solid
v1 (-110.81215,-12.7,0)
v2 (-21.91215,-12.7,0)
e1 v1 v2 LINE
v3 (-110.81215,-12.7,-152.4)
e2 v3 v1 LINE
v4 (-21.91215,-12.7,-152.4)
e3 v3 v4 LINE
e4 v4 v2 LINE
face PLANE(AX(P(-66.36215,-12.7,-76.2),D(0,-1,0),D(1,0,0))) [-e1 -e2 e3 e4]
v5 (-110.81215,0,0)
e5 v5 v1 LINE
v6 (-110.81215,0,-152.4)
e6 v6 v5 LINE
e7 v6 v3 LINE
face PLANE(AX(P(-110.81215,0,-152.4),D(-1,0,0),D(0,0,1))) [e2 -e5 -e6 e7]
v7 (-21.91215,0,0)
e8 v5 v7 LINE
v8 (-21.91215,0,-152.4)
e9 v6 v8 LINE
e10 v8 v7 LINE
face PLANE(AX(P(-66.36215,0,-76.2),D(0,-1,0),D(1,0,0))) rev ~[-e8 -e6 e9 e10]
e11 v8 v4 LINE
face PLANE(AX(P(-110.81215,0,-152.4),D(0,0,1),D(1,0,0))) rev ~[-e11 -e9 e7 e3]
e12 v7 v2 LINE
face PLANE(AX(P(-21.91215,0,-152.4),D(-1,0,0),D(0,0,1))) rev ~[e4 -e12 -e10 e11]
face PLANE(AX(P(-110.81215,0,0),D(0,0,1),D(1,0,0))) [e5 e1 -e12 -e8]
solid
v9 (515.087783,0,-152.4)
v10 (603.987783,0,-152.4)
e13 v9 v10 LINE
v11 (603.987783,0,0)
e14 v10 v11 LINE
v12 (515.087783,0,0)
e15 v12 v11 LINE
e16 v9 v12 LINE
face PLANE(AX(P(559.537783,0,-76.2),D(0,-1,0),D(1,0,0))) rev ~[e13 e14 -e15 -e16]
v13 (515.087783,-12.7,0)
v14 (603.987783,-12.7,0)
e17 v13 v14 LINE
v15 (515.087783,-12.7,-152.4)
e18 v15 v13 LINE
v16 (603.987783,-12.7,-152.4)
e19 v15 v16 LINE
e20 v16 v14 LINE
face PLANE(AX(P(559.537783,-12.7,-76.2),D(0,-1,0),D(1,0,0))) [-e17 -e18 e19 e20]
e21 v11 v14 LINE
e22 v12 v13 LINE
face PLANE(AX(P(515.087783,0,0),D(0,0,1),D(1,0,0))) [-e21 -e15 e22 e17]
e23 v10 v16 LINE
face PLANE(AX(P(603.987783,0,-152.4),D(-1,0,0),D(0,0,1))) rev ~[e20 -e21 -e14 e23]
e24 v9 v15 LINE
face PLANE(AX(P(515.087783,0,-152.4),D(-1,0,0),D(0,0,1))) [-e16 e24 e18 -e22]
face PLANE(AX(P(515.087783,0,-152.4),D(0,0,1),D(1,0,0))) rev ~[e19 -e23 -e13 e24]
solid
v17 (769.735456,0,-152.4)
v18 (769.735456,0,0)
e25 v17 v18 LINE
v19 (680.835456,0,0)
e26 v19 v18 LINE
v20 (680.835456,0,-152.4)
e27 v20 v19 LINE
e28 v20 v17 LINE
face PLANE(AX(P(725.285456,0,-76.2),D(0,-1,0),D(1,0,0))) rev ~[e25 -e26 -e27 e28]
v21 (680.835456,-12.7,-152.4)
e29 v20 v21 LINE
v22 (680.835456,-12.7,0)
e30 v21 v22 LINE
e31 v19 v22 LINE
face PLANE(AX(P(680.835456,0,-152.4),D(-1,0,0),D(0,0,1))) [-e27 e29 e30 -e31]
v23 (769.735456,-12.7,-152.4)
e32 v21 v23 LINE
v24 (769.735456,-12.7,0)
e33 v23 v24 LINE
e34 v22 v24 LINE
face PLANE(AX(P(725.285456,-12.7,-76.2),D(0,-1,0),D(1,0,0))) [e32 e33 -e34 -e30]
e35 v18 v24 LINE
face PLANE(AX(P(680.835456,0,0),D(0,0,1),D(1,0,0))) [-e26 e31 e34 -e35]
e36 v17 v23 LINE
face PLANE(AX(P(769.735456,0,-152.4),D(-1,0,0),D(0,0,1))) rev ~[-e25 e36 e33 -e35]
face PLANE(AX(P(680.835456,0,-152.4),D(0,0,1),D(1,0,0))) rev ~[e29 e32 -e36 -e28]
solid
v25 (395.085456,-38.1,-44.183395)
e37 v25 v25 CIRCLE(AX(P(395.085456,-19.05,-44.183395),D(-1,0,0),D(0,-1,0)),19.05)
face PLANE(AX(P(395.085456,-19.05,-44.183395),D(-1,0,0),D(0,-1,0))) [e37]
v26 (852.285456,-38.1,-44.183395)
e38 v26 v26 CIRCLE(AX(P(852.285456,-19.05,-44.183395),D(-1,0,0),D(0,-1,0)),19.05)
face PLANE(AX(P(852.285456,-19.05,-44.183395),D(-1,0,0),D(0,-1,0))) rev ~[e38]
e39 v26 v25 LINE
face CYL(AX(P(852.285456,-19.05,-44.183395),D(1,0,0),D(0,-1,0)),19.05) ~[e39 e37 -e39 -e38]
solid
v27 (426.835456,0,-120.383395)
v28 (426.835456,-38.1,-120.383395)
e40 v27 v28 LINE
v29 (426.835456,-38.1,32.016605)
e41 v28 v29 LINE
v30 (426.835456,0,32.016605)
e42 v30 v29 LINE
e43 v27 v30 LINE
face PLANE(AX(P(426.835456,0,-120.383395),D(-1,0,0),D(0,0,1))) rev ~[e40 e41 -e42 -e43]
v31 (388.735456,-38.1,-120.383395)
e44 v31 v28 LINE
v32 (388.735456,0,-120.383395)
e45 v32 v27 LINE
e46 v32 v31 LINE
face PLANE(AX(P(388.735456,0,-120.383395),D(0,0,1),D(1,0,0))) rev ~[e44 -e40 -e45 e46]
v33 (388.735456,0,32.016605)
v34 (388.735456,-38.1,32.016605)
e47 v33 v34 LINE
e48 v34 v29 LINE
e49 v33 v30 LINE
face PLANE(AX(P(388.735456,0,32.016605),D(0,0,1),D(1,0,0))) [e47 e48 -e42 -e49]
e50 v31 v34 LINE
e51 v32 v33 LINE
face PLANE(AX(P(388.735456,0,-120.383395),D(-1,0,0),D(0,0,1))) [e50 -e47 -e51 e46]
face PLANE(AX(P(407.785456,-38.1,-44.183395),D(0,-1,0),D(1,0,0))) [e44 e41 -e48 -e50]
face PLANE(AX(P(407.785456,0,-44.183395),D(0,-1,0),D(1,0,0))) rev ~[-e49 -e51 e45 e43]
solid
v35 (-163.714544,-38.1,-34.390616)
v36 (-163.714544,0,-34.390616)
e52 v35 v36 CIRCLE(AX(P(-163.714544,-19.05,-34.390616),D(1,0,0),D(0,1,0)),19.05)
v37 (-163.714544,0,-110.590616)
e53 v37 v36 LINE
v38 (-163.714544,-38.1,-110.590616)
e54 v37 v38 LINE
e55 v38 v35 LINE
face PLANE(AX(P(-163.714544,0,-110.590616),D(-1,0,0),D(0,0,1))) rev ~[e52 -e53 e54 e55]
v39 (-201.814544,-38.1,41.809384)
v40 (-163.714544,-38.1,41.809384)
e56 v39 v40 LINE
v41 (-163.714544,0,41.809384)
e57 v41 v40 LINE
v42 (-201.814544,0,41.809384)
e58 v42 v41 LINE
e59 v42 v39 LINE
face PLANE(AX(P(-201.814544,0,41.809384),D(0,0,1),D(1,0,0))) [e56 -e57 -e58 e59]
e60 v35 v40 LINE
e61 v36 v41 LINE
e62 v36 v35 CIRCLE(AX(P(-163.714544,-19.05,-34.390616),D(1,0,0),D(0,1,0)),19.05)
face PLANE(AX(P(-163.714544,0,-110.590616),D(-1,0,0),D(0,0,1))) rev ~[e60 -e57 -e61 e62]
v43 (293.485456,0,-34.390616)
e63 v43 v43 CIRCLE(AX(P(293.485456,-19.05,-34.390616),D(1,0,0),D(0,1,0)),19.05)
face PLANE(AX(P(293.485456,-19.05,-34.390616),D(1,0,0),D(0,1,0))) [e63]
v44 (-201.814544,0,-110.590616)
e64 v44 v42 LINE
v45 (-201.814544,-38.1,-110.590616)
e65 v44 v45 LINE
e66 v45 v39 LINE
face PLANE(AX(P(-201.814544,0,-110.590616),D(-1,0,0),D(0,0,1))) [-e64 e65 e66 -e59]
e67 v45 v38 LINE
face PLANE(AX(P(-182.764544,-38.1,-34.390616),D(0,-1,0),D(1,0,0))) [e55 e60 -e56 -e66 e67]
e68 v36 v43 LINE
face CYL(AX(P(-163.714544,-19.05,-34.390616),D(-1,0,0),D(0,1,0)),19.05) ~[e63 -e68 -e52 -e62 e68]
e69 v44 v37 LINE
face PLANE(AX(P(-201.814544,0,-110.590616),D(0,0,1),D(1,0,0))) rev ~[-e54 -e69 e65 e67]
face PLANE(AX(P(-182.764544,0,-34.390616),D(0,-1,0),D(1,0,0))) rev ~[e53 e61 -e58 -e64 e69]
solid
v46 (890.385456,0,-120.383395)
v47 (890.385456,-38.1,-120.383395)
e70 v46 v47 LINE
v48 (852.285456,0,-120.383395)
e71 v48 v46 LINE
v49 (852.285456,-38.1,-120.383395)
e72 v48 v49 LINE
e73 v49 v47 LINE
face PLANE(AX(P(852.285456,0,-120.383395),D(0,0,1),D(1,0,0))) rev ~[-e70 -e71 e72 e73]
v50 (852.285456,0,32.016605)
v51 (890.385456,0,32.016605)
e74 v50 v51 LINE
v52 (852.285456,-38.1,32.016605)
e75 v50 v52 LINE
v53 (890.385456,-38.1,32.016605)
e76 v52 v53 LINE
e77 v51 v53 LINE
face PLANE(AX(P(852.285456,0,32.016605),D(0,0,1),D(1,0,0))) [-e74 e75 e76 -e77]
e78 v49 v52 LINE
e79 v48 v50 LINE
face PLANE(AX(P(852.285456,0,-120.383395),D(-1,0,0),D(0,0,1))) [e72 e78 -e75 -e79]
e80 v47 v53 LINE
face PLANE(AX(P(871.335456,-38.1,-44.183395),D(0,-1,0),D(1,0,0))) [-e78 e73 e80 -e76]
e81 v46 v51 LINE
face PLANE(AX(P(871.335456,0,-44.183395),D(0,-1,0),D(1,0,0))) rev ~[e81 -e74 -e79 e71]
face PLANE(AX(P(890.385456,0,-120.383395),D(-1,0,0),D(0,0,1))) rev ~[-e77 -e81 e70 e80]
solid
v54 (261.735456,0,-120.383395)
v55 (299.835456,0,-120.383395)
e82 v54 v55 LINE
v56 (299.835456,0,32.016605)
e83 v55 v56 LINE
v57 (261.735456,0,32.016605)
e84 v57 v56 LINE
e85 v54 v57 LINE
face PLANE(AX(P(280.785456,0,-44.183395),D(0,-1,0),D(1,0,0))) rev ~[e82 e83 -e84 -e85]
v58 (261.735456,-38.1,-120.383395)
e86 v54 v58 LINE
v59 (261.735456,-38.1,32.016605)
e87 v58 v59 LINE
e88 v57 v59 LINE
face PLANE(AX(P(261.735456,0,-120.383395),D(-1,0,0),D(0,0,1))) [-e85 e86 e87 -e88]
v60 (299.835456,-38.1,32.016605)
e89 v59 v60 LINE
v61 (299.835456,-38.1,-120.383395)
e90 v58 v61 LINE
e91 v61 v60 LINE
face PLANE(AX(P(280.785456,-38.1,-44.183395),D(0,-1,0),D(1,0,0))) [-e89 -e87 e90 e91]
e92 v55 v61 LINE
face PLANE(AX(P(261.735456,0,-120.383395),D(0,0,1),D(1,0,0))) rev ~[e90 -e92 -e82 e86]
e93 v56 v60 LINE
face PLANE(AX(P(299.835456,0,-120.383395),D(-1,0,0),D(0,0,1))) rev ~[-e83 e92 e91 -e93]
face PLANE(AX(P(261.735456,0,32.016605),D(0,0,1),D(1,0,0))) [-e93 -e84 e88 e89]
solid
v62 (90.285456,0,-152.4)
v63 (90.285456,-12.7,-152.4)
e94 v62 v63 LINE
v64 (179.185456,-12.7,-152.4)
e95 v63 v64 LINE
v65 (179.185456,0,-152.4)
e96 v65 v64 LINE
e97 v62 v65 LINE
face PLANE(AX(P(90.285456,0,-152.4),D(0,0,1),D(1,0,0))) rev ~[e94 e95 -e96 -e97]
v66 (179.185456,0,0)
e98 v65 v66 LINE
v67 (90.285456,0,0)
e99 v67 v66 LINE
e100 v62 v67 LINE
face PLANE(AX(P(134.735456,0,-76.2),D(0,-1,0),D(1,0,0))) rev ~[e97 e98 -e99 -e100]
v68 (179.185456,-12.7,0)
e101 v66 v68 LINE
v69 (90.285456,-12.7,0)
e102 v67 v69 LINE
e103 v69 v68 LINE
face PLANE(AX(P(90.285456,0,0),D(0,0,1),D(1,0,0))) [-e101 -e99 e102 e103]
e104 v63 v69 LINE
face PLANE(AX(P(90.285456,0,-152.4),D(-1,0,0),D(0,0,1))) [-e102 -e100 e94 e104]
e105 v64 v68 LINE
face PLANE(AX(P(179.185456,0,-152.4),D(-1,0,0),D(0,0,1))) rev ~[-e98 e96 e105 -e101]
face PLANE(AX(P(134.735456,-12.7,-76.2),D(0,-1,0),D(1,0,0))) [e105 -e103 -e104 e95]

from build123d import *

# Parameters (mm, degrees)
F0_W     = 38.1
F0_H     = 152.4
F1_DEPTH = 38.1
F3_DEPTH = 457.2
F4_R     = 19.05
F5_DEPTH = 457.2
F6_W     = 88.9
F6_H     = 152.4
F7_DEPTH = 12.7


with BuildPart() as f1:
    # F0 (on Front) → F1 (new body)
    with BuildSketch(Plane.XZ):
        with Locations((-182.7645437746, -34.3906155205)):
            Rectangle(F0_W, F0_H)
    extrude(amount=F1_DEPTH)

    # F2 (on face) → F3 (join)
    with BuildSketch(Plane.YZ.offset(-163.7145437746)):
        with BuildLine():
            ThreePointArc((-38.1, -34.3906155205), (-19.05, -53.4406155205), (0, -34.3906155205))
            ThreePointArc((0, -34.3906155205), (-19.05, -15.3406155205), (-38.1, -34.3906155205))
        make_face()
    extrude(amount=F3_DEPTH)


with BuildPart() as f1b:
    # F0 (on Front) → F1, piece 2 (new body)
    with BuildSketch(Plane.XZ):
        with Locations((280.7854562254, -44.1833949373)):
            Rectangle(F0_W, F0_H)
    extrude(amount=F1_DEPTH)


with BuildPart() as f1c:
    # F0 (on Front) → F1, piece 3 (new body)
    with BuildSketch(Plane.XZ):
        with Locations((407.7854562254, -44.1833949373)):
            Rectangle(F0_W, F0_H)
    extrude(amount=F1_DEPTH)


with BuildPart() as f1d:
    # F0 (on Front) → F1, piece 4 (new body)
    with BuildSketch(Plane.XZ):
        with Locations((871.3354562254, -44.1833949373)):
            Rectangle(F0_W, F0_H)
    extrude(amount=F1_DEPTH)


with BuildPart() as f5:
    # F4 (on face) → F5 (new body)
    with BuildSketch(Plane(origin=(852.2854562254, 0, 0), x_dir=(0, -1, 0), z_dir=(-1, 0, 0))):
        with Locations((19.05, -44.1833949373)):
            Circle(F4_R)
    extrude(amount=F5_DEPTH)


with BuildPart() as f7:
    # F6 (on Front) → F7 (new body)
    with BuildSketch(Plane.XZ):
        with Locations((134.7354562254, -76.2)):
            Rectangle(F6_W, F6_H)
    extrude(amount=F7_DEPTH)


with BuildPart() as f7b:
    # F6 (on Front) → F7, piece 2 (new body)
    with BuildSketch(Plane.XZ):
        with Locations((725.2854562254, -76.2)):
            Rectangle(F6_W, F6_H)
    extrude(amount=F7_DEPTH)


with BuildPart() as f7c:
    # F6 (on Front) → F7, piece 3 (new body)
    with BuildSketch(Plane.XZ):
        with Locations((559.5377833366, -76.2)):
            Rectangle(F6_W, F6_H)
    extrude(amount=F7_DEPTH)


with BuildPart() as f7d:
    # F6 (on Front) → F7, piece 4 (new body)
    with BuildSketch(Plane.XZ):
        with Locations((-66.3621499419, -76.2)):
            Rectangle(F6_W, F6_H)
    extrude(amount=F7_DEPTH)


solid = Compound([f1.part, f1b.part, f1c.part, f1d.part, f5.part, f7.part, f7b.part, f7c.part, f7d.part])
